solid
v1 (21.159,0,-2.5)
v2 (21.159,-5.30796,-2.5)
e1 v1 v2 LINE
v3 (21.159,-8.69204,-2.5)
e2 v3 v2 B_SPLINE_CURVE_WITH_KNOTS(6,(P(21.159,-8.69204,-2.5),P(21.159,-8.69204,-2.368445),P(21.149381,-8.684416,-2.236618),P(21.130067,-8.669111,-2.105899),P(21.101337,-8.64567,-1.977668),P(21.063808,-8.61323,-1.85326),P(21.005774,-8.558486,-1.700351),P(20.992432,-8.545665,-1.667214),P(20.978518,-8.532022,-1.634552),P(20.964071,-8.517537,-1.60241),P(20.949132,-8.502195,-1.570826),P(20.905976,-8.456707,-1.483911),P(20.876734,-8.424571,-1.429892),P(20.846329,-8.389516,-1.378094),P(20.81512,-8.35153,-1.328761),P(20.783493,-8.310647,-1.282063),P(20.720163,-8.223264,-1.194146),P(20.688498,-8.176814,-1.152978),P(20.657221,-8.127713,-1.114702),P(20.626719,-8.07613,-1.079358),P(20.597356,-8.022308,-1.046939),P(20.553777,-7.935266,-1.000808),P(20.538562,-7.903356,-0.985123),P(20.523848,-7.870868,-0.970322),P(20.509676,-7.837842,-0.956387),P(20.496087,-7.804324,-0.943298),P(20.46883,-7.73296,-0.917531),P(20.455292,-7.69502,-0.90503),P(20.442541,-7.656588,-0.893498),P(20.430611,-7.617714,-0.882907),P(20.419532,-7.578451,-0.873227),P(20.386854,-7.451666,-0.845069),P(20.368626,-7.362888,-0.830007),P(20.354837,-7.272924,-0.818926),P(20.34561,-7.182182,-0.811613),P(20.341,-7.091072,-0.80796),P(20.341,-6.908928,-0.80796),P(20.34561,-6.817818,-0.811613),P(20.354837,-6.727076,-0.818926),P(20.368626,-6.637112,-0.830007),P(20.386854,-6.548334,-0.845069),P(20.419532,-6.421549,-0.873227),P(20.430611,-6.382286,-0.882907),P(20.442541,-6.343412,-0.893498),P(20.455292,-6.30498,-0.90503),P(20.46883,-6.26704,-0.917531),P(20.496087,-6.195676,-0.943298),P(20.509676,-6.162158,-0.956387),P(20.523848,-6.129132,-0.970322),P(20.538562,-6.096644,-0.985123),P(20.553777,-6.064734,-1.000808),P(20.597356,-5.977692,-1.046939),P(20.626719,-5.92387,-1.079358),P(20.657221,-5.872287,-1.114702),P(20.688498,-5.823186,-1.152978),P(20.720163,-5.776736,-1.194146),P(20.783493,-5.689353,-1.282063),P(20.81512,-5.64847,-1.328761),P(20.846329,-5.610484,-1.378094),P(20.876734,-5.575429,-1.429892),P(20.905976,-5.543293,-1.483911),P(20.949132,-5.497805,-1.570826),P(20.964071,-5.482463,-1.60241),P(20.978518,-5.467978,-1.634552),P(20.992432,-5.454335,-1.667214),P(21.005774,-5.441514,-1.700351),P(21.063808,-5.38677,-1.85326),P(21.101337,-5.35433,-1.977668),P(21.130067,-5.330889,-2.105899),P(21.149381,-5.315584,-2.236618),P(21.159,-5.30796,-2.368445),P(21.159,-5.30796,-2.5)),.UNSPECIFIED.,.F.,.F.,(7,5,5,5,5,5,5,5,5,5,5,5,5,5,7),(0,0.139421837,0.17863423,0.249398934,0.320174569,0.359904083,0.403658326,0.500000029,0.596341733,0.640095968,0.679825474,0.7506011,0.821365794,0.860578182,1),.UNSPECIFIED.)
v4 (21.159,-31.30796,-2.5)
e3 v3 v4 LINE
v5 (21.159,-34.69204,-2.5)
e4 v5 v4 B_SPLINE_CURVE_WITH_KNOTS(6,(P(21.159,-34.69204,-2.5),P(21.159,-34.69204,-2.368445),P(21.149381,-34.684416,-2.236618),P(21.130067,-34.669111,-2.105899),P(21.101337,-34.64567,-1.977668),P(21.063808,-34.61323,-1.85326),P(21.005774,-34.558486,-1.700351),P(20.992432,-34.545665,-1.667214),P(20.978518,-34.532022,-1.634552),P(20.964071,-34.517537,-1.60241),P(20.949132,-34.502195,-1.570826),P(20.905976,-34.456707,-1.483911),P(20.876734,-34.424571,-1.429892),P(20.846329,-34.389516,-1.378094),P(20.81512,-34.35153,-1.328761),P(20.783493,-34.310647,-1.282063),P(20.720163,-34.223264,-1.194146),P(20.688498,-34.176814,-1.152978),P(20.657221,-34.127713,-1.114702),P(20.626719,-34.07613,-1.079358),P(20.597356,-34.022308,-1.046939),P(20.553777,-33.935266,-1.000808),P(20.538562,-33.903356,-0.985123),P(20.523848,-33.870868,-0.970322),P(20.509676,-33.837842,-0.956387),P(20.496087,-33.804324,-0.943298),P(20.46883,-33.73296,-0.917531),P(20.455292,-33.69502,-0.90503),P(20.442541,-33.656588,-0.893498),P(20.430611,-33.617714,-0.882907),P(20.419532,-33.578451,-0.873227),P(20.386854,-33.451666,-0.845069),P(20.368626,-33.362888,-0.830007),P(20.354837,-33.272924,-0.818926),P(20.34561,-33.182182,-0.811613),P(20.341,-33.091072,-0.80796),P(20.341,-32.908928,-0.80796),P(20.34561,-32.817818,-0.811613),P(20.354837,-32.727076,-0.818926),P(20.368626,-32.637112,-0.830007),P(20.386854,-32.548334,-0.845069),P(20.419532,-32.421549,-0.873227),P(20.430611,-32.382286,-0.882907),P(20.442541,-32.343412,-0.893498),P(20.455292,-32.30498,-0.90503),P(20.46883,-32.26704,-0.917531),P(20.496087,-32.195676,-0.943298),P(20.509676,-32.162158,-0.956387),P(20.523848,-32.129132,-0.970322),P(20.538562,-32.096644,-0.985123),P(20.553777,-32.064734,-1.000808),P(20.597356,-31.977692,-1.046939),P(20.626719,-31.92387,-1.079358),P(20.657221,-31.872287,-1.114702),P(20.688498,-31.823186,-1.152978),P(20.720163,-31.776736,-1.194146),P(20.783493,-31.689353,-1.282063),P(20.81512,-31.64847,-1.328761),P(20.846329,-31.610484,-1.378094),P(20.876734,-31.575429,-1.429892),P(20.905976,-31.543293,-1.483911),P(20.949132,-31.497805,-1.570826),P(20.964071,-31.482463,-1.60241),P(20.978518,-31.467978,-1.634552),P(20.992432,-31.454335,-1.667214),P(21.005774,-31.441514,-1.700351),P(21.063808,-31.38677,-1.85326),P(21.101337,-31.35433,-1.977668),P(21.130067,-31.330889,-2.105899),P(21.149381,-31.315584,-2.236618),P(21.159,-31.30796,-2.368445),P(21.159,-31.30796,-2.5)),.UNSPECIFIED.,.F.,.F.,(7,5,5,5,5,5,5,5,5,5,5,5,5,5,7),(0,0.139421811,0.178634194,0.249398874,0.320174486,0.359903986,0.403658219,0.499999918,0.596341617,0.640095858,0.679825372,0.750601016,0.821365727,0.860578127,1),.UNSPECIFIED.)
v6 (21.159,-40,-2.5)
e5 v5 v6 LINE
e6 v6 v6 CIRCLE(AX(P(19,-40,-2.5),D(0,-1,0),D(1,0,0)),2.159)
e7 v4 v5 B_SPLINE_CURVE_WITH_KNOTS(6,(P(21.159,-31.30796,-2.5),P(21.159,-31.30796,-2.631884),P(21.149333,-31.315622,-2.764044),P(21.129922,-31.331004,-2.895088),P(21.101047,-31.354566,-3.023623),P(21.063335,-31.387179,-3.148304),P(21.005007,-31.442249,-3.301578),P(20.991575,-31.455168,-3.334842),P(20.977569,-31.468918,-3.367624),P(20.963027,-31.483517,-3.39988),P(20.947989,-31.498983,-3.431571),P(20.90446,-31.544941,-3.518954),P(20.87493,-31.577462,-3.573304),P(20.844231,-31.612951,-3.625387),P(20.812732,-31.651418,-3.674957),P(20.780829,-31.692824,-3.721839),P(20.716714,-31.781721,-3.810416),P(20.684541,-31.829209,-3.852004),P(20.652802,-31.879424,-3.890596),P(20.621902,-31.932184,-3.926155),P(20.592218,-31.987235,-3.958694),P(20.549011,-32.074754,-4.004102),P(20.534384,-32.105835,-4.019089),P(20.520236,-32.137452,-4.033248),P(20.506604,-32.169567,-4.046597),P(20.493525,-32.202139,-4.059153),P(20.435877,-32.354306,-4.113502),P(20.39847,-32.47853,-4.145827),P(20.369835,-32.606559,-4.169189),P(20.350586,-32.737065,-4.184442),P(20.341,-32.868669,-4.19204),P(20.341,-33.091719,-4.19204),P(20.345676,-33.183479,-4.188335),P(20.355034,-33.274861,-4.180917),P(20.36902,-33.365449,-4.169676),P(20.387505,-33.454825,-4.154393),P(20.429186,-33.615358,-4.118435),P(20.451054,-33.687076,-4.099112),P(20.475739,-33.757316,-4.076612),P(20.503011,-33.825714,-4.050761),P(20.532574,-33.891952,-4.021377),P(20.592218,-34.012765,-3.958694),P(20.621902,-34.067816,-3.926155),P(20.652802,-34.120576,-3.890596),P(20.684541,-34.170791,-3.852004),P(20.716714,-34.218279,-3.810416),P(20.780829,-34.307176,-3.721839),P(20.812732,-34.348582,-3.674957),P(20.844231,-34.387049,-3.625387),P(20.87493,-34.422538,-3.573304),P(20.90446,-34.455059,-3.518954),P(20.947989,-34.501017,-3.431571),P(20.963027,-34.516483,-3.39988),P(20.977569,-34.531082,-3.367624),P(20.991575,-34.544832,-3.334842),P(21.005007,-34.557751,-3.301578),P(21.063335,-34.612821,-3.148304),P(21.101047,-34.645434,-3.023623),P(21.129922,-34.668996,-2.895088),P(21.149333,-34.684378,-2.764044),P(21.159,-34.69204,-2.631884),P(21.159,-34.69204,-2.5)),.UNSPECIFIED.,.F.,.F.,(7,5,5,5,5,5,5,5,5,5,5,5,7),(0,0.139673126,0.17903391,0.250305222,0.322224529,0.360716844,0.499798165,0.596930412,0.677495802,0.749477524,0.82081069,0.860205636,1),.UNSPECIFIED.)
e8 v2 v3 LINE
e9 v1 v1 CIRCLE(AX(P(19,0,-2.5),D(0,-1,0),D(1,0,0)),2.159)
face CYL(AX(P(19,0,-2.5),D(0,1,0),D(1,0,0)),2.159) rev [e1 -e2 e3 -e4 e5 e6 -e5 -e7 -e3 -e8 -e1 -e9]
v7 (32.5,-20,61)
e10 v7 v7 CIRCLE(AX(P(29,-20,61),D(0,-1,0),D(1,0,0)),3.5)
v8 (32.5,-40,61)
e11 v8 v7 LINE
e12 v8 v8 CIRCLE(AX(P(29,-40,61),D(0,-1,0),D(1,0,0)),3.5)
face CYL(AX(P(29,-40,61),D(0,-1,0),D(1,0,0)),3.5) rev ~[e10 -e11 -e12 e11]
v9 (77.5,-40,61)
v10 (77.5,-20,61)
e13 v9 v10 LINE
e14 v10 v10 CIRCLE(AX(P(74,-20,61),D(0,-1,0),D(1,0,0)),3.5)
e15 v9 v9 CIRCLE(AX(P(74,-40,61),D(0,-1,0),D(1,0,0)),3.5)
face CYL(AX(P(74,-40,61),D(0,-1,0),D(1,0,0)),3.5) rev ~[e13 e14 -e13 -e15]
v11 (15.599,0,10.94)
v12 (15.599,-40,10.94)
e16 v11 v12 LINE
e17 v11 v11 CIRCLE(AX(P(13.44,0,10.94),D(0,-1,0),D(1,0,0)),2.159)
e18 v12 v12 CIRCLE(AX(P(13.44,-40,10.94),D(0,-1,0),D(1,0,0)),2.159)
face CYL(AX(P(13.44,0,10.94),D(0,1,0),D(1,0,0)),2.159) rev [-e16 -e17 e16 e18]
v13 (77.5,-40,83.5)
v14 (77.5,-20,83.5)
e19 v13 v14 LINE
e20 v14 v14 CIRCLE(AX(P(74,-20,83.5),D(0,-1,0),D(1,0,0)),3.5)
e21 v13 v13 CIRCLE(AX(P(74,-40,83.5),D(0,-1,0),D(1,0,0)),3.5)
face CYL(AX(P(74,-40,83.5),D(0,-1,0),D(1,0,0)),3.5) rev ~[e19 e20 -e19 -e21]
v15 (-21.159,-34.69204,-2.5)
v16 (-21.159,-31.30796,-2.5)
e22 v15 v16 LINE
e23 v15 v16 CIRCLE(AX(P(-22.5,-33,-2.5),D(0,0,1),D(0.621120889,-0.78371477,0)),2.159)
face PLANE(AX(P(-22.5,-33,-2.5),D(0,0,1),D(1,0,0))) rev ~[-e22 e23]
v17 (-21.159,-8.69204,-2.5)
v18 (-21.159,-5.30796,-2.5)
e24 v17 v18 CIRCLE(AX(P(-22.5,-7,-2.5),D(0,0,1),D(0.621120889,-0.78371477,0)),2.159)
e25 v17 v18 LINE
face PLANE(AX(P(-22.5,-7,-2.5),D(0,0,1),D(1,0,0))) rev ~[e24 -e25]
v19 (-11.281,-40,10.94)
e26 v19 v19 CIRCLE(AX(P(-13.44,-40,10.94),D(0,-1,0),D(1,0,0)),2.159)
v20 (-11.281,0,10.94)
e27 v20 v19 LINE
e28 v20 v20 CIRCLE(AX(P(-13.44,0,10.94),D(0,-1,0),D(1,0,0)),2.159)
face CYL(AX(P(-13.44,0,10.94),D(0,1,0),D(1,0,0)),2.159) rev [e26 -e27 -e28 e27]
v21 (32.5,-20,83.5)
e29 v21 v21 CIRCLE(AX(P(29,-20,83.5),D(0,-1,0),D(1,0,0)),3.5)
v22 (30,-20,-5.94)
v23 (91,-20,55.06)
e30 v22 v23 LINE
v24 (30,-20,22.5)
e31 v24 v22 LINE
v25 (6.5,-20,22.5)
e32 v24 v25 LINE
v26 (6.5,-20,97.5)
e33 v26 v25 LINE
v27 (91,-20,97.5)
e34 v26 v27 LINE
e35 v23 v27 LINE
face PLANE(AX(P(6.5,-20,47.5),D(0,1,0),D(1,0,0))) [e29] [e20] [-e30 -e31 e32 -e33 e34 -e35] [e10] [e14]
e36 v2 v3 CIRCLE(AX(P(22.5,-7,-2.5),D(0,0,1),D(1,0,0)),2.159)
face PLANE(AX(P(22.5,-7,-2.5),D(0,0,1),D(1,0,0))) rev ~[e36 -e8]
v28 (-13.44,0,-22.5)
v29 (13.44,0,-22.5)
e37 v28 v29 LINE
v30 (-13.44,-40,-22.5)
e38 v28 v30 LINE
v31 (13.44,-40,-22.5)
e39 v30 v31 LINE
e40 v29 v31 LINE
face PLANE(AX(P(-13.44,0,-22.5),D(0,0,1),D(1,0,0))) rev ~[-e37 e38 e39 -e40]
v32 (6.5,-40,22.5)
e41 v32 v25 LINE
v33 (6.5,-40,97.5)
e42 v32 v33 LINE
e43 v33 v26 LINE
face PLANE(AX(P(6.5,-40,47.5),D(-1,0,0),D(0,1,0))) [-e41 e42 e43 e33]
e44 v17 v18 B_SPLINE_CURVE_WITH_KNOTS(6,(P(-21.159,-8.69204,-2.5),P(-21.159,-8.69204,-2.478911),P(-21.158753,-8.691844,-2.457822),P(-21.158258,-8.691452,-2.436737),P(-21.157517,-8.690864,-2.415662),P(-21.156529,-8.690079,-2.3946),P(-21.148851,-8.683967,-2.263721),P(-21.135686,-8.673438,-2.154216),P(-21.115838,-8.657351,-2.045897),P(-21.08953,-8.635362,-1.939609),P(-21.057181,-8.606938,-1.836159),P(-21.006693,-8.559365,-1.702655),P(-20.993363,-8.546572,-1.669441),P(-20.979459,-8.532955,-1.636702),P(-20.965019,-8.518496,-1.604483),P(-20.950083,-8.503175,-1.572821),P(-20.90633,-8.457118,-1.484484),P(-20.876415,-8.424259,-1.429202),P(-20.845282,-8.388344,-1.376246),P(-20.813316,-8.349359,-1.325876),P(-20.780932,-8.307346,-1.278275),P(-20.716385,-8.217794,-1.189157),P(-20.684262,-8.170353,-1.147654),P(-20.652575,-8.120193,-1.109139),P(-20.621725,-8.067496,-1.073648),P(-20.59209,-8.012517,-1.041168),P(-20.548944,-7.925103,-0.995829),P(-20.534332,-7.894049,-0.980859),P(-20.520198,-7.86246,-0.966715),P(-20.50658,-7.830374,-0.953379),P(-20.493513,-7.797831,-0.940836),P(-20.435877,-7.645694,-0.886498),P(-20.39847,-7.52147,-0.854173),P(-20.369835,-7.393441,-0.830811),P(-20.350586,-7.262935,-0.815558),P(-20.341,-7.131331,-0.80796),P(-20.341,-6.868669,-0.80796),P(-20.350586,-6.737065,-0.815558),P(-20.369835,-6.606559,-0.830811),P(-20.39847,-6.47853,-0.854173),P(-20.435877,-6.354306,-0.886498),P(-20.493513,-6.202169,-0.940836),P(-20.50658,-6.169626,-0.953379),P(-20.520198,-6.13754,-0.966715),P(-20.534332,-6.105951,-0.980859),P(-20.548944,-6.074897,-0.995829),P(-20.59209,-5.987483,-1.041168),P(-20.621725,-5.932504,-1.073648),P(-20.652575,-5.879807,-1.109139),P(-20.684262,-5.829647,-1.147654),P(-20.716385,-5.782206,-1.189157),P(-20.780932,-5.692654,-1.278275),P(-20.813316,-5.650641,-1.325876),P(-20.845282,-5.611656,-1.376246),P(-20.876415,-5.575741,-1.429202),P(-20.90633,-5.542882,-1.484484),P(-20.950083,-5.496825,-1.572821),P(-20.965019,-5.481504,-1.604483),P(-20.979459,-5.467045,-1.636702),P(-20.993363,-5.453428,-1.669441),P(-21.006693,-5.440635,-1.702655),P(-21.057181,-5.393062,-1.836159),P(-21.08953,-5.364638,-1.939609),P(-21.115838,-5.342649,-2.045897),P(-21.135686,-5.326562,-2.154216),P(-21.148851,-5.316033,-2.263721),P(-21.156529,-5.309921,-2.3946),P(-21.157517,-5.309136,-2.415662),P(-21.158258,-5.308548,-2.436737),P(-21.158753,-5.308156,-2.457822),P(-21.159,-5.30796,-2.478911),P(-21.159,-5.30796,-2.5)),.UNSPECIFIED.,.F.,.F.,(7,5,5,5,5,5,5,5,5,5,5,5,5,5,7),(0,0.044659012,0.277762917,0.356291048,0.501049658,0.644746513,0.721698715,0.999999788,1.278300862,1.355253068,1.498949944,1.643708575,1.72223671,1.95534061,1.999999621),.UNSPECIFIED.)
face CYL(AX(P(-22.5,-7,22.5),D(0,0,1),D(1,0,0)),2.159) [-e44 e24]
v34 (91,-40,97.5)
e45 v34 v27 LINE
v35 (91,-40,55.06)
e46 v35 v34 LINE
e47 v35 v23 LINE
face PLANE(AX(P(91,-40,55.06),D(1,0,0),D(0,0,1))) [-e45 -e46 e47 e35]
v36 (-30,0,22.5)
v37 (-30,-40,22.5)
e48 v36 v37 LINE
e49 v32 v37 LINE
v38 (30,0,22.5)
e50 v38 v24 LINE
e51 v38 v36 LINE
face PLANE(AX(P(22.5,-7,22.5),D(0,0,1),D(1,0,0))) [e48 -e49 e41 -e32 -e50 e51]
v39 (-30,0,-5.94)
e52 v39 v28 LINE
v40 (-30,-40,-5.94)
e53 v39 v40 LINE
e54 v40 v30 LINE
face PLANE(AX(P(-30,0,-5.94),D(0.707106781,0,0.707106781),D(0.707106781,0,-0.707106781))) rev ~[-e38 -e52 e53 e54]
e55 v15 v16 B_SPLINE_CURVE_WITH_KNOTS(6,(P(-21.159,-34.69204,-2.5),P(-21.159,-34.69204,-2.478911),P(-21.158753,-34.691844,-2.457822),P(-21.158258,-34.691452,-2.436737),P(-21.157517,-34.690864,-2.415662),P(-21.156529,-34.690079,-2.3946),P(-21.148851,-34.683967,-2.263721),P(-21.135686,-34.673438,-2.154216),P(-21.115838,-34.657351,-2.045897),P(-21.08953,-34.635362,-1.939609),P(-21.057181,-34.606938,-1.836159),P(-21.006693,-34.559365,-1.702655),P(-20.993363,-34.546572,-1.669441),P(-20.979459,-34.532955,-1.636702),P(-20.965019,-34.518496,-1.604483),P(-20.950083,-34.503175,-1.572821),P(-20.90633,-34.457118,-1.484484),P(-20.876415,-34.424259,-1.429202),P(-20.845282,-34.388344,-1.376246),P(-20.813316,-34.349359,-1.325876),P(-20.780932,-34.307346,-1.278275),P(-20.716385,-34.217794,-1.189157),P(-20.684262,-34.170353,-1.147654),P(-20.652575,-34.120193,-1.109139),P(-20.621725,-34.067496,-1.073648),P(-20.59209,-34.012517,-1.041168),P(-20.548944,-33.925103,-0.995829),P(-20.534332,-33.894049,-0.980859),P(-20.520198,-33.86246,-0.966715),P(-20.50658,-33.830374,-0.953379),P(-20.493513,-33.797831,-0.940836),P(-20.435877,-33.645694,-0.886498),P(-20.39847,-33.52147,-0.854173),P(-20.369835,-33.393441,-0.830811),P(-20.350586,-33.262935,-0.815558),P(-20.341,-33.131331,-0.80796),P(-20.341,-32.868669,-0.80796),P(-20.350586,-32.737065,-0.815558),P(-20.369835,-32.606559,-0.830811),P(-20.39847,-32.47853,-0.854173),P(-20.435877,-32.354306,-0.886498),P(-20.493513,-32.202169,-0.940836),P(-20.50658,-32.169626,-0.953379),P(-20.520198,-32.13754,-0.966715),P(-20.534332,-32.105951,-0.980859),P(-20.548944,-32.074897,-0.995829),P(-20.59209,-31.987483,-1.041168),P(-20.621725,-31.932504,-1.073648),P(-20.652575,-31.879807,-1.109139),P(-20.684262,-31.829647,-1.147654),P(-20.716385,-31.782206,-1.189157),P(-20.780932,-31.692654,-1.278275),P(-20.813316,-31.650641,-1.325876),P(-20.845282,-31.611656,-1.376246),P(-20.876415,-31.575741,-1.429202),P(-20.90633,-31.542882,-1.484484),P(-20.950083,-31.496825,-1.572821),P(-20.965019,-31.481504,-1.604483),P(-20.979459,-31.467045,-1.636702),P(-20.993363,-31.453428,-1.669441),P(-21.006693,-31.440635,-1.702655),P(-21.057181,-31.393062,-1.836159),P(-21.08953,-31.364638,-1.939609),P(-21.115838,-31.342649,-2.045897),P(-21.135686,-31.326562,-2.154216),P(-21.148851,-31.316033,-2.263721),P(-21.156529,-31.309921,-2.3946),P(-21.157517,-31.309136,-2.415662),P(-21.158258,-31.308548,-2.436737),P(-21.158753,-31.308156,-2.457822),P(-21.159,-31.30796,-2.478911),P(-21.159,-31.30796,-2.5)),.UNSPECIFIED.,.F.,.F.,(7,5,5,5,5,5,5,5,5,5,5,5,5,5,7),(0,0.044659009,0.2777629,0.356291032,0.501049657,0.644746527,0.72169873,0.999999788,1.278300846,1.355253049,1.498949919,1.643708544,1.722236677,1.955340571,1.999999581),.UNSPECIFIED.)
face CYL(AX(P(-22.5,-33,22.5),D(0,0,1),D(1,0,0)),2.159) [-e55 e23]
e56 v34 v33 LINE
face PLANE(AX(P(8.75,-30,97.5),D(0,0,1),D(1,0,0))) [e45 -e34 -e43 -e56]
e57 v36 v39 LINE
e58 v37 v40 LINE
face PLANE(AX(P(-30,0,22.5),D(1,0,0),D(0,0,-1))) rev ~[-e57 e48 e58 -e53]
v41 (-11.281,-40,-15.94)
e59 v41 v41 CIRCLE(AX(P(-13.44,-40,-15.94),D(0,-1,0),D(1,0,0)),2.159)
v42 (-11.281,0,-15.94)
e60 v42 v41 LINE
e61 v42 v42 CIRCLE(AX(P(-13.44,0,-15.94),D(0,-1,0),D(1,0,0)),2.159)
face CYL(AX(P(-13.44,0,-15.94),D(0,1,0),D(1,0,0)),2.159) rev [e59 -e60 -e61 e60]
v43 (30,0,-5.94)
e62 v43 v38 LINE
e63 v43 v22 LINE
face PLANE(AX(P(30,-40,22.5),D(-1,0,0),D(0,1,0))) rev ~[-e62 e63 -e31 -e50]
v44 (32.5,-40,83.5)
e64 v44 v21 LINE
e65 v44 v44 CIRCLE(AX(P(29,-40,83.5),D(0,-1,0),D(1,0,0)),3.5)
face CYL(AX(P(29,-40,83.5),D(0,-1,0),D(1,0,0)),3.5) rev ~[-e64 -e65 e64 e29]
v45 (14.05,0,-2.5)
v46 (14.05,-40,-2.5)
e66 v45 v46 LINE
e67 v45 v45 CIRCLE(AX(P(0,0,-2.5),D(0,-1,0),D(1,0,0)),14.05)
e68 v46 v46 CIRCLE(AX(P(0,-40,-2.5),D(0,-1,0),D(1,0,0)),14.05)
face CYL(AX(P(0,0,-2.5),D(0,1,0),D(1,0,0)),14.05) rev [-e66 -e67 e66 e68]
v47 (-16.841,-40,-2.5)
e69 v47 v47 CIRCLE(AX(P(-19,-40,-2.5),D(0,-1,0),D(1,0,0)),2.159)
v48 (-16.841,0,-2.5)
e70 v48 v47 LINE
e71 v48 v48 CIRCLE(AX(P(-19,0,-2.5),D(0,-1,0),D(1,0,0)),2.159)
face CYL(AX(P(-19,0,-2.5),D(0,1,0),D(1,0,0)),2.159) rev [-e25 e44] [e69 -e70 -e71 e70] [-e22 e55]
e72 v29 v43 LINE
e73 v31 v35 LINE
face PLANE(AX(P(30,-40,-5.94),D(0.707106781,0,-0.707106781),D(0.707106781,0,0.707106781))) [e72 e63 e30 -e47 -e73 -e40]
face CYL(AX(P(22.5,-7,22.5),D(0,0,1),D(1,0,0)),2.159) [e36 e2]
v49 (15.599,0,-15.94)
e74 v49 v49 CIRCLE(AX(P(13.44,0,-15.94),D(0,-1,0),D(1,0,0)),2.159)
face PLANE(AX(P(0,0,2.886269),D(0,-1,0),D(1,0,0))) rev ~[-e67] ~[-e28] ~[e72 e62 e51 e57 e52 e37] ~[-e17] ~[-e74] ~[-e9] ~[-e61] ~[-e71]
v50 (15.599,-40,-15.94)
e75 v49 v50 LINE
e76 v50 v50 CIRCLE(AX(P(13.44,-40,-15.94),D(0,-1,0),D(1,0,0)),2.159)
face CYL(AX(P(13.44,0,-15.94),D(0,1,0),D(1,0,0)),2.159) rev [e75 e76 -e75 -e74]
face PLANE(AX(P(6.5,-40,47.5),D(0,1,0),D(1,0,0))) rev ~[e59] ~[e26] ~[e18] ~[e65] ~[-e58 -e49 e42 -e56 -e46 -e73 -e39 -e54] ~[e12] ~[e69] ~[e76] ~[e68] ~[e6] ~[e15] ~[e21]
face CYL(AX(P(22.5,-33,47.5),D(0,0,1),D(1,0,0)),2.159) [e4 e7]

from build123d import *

# Parameters (mm, degrees)
F0_R      = 2.159
F0_R_2    = 14.05
F1_DEPTH  = 40
F2_R      = 2.159
F3_DEPTH  = 15
F5_DEPTH  = 25
F6_R      = 2.159
F7_DEPTH  = 25
F4_W      = 19
F4_H      = 20
F4_R      = 2.159
F8_DEPTH  = 25
F9_R      = 2.159
F10_DEPTH = 57.1
F11_R     = 3.5
F12_DEPTH = 20
F9_W      = 4.5
F9_H      = 20
F13_DEPTH = 25
F14_DEPTH = 50


# Not quite as in the source:
# - an extrude ends at something that could not be found from the text; its depth is read off the source's solid


with BuildPart() as f1:
    # F0 (on Front) → F1 (new body)
    with BuildSketch(Plane.XZ):
        Polygon((30, -5.94), (30, 22.5), (-30, 22.5), (-30, -5.94), (-13.44, -22.5), (13.44, -22.5), align=None)
        with Locations((-13.44, -15.94)):
            Circle(F0_R, mode=Mode.SUBTRACT)
        with Locations((-19, -2.5)):
            Circle(F0_R, mode=Mode.SUBTRACT)
        with Locations((13.44, -15.94)):
            Circle(F0_R, mode=Mode.SUBTRACT)
        with Locations((0, -2.5)):
            Circle(F0_R_2, mode=Mode.SUBTRACT)
        with Locations((19, -2.5)):
            Circle(F0_R, mode=Mode.SUBTRACT)
        with Locations((-13.44, 10.94)):
            Circle(F0_R, mode=Mode.SUBTRACT)
        with Locations((13.44, 10.94)):
            Circle(F0_R, mode=Mode.SUBTRACT)
    extrude(amount=F1_DEPTH)

    # F2 (on face) → F3 (cut)
    with BuildSketch(Plane.XY.offset(22.5)):
        with Locations((-22.5, -7)):
            Circle(F2_R)
        with Locations((22.5, -7)):
            Circle(F2_R)
        with Locations((-22.5, -33)):
            Circle(F2_R)
        with Locations((22.5, -33)):
            Circle(F2_R)
    extrude(amount=-F3_DEPTH, mode=Mode.SUBTRACT)

    # F2 (on face) → F5 (join)
    with BuildSketch(Plane.XY.offset(22.5)):
        with Locations((22.5, -33)):
            Circle(F2_R)
    extrude(amount=-F5_DEPTH)

    # F6 (on face) → F7 (join)
    with BuildSketch(Plane.XY.offset(22.5)):
        with Locations((22.5, -7)):
            Circle(F6_R)
        with Locations((22.5, -33)):
            Circle(F6_R)
        with Locations((-22.5, -7)):
            Circle(F6_R)
        with Locations((-22.5, -33)):
            Circle(F6_R)
    extrude(amount=-F7_DEPTH)

    # F4 (on face) → F8 (join)
    with BuildSketch(Plane.XY.offset(22.5)):
        with Locations((20.5, -30)):
            Rectangle(F4_W, F4_H)
        with Locations((22.5, -33)):
            Circle(F4_R, mode=Mode.SUBTRACT)
    extrude(amount=F8_DEPTH)

    # F9 (on face) → F10 (join)
    with BuildSketch(Plane.XY.offset(47.5)):
        with Locations((22.5, -33)):
            Circle(F9_R)
    extrude(amount=-F10_DEPTH)

    # F11 (on face) → F12 (join, through all)
    with BuildSketch(Plane.XZ.offset(40)):
        Polygon((11, 83.5), (11, 47.5), (30, 47.5), (30, -5.94), (91, 55.06), (91, 97.5), (11, 97.5), align=None)
        with Locations((29, 61)):
            Circle(F11_R, mode=Mode.SUBTRACT)
        with Locations((29, 83.5)):
            Circle(F11_R, mode=Mode.SUBTRACT)
        with Locations((74, 61)):
            Circle(F11_R, mode=Mode.SUBTRACT)
        with Locations((74, 83.5)):
            Circle(F11_R, mode=Mode.SUBTRACT)
    extrude(amount=-F12_DEPTH)

    # F9 (on face) → F13 (join)
    with BuildSketch(Plane.XY.offset(47.5)):
        with Locations((8.75, -30)):
            Rectangle(F9_W, F9_H)
    extrude(amount=-F13_DEPTH)

    # F9 (on face) → F14 (join, through all)
    with BuildSketch(Plane.XY.offset(47.5)):
        with Locations((8.75, -30)):
            Rectangle(F9_W, F9_H)
    extrude(amount=F14_DEPTH)


solid = f1.part
